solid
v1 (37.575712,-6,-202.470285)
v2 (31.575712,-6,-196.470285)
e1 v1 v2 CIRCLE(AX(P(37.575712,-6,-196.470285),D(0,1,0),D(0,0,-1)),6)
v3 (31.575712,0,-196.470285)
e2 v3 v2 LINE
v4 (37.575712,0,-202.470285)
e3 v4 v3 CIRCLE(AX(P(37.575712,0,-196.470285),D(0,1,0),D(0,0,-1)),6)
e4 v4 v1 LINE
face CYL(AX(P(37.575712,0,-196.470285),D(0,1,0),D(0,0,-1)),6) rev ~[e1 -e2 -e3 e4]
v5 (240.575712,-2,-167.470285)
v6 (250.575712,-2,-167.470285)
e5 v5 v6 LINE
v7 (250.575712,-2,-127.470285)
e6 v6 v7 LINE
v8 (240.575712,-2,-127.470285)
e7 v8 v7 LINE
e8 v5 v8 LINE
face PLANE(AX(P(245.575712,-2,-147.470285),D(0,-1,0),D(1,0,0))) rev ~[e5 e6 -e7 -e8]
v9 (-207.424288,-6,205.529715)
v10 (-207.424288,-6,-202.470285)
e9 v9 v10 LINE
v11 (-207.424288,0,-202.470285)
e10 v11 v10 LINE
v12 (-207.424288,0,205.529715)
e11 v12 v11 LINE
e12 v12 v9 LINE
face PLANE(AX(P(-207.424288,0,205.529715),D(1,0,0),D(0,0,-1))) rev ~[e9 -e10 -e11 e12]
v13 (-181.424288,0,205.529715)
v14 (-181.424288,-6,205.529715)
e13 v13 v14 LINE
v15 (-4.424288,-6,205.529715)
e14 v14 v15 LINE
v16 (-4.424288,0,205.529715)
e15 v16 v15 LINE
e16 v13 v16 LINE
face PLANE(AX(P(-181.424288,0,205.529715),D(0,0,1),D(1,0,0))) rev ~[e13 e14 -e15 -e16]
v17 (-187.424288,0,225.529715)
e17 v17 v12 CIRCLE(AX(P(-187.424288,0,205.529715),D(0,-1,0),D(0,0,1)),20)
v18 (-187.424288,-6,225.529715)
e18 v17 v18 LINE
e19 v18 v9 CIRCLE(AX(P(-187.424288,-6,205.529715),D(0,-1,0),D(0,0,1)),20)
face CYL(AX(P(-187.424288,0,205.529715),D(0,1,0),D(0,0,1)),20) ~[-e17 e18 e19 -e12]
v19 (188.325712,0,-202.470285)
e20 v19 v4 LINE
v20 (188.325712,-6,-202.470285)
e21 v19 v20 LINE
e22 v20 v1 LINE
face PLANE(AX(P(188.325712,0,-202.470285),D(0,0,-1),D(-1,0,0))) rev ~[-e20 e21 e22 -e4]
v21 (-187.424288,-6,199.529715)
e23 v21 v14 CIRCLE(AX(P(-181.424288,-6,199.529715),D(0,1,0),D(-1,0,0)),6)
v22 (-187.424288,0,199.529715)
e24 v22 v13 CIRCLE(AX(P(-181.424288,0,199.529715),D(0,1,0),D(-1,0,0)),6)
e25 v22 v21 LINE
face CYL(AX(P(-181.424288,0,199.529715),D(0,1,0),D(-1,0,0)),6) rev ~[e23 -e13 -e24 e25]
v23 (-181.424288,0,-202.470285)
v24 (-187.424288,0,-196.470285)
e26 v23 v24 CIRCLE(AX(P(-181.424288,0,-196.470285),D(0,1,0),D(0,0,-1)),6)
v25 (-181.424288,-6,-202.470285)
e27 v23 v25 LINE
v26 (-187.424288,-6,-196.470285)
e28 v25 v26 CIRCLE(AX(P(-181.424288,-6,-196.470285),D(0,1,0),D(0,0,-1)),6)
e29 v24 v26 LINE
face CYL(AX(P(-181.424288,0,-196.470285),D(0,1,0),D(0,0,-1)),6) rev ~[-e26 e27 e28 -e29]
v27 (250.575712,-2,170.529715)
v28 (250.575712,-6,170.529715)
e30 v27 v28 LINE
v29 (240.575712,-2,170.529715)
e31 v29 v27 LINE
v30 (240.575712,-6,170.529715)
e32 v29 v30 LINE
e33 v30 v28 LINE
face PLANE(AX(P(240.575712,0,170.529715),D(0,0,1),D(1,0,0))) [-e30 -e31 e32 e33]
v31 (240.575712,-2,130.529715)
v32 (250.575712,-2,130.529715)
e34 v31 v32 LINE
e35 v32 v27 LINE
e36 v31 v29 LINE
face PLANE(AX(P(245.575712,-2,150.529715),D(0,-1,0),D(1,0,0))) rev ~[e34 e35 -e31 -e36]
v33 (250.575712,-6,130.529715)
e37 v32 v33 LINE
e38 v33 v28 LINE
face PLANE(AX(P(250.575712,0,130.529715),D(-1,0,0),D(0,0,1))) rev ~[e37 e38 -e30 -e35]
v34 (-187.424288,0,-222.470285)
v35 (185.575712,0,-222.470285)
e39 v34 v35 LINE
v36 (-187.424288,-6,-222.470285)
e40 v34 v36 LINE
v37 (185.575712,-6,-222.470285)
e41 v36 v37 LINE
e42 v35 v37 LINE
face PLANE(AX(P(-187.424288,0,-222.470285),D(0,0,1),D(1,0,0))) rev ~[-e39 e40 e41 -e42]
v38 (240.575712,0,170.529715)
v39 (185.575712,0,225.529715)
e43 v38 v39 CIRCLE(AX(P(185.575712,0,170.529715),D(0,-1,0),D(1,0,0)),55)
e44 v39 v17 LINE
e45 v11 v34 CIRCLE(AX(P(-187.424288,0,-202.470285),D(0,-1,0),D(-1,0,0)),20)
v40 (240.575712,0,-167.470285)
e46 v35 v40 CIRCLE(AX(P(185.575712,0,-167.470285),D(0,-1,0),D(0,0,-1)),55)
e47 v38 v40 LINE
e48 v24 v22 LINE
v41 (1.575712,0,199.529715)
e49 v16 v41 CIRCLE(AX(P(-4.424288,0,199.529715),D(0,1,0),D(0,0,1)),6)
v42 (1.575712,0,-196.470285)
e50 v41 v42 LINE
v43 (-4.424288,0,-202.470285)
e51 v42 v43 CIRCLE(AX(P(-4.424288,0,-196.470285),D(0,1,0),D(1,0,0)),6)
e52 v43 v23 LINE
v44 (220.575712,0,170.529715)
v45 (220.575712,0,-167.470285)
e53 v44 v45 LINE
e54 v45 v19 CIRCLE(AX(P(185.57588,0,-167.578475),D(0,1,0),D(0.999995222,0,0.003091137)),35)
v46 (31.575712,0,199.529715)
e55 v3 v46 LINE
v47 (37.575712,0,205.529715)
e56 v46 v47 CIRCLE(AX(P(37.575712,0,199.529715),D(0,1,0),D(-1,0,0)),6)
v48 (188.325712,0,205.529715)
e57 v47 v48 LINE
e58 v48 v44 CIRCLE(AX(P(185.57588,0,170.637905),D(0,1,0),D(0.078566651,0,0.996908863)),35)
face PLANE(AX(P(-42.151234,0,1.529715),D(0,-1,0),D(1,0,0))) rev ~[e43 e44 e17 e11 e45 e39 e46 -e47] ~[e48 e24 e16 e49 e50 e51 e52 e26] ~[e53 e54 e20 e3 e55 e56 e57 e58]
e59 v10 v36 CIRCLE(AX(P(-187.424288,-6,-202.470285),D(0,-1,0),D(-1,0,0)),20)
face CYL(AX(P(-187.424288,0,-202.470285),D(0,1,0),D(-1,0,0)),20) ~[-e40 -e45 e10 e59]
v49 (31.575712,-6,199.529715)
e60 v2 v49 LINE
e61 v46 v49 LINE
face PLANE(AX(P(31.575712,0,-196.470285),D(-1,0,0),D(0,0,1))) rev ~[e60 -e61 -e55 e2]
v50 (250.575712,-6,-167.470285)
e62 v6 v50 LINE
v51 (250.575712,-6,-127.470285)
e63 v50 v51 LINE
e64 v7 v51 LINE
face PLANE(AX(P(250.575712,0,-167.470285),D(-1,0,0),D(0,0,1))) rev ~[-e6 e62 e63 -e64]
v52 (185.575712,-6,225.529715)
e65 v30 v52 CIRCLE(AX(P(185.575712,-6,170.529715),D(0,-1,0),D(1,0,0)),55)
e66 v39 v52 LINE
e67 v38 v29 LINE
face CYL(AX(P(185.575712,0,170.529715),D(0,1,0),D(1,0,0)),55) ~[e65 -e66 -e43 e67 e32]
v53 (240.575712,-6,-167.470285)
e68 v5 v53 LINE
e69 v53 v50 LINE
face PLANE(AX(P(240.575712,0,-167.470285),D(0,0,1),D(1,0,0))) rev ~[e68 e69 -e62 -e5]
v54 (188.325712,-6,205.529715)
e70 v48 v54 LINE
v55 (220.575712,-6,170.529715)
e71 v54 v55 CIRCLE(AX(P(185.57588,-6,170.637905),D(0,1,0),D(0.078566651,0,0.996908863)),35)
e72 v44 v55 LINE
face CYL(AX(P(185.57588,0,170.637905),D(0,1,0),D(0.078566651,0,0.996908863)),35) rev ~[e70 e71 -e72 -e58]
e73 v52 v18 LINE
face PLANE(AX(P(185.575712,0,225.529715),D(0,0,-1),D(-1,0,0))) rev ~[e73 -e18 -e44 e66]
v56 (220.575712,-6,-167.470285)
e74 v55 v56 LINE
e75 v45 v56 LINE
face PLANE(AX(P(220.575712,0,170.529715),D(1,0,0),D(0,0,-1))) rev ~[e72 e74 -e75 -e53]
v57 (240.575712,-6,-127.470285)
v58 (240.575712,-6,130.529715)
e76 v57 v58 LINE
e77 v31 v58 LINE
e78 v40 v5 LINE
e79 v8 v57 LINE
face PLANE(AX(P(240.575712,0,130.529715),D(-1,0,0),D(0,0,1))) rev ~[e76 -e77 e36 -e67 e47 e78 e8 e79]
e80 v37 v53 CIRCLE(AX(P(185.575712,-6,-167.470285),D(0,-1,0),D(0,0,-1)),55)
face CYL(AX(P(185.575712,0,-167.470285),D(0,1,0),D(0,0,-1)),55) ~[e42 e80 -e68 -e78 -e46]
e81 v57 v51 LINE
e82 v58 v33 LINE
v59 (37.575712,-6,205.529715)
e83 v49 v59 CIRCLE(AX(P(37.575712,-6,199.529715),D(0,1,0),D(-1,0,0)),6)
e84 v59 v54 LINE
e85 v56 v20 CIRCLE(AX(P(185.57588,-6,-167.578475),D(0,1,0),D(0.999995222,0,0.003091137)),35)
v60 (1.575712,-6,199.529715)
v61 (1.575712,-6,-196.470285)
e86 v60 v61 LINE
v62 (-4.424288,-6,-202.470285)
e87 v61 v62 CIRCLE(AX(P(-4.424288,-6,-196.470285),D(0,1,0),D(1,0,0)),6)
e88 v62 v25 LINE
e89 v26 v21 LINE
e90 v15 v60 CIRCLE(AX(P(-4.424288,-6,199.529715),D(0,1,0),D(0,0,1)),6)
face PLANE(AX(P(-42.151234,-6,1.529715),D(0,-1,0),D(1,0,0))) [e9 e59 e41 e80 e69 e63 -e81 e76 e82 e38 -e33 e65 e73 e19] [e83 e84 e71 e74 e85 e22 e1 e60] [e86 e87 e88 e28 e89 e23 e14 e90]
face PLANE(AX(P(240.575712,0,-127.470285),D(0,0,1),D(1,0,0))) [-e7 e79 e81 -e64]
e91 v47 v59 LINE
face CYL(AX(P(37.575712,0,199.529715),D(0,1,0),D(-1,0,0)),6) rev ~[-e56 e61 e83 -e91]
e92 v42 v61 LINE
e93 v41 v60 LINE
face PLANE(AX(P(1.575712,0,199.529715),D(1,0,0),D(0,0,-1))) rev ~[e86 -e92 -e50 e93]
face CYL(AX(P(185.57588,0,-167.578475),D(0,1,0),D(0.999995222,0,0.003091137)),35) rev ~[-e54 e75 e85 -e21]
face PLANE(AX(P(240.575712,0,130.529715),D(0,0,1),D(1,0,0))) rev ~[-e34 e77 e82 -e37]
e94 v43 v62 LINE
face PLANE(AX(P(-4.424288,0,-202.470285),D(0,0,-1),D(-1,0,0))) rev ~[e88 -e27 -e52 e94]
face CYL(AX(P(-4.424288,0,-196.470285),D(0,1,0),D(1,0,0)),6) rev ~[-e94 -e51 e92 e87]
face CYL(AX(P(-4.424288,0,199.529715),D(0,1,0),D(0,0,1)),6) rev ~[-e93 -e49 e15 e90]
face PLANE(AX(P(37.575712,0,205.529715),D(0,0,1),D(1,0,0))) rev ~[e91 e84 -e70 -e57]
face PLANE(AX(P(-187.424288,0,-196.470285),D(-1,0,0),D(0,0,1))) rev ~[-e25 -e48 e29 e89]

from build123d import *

# Parameters (mm, degrees)
F0_W     = 10
F0_H     = 40
F0_W_2   = 6
F0_W_3   = 14
F0_H_2   = 258
F1_DEPTH = 6
F2_DEPTH = 2


with BuildPart() as f1:
    # F0 (on Front) → F1 (new body)
    with BuildSketch(Plane.XZ):
        with BuildLine():
            Line((185.575712414, 225.5297148285), (-187.424287586, 225.5297148285))
            ThreePointArc((-187.424287586, 225.5297148285), (-201.5664232098, 219.6718504522), (-207.424287586, 205.5297148285))
            Line((-207.424287586, 205.5297148285), (-207.424287586, -202.4702851715))
            ThreePointArc((-207.424287586, -202.4702851715), (-201.5664232098, -216.6124207953), (-187.424287586, -222.4702851715))
            Line((-187.424287586, -222.4702851715), (185.575712414, -222.4702851715))
            ThreePointArc((185.575712414, -222.4702851715), (224.4665853792, -206.3611581368), (240.575712414, -167.4702851715))
            Line((240.575712414, -167.4702851715), (234.575712414, -167.4702851715))
            ThreePointArc((234.575712414, -167.4702851715), (220.2239446921, -202.1185174497), (185.575712414, -216.4702851715))
            Line((185.575712414, -216.4702851715), (-187.424287586, -216.4702851715))
            ThreePointArc((-187.424287586, -216.4702851715), (-197.3237825226, -212.3697801081), (-201.424287586, -202.4702851715))
            Line((-201.424287586, -202.4702851715), (-201.424287586, 205.5297148285))
            ThreePointArc((-201.424287586, 205.5297148285), (-197.3237825226, 215.4292097651), (-187.424287586, 219.5297148285))
            Line((-187.424287586, 219.5297148285), (185.575712414, 219.5297148285))
            ThreePointArc((185.575712414, 219.5297148285), (220.2239446921, 205.1779471066), (234.575712414, 170.5297148285))
            Line((234.575712414, 170.5297148285), (240.575712414, 170.5297148285))
            ThreePointArc((240.575712414, 170.5297148285), (224.4665853792, 209.4205877937), (185.575712414, 225.5297148285))
        make_face()
        with BuildLine():
            Line((220.575712414, 170.5297148285), (234.575712414, 170.5297148285))
            ThreePointArc((234.575712414, 170.5297148285), (220.2239446921, 205.1779471066), (185.575712414, 219.5297148285))
            Line((185.575712414, 219.5297148285), (-187.424287586, 219.5297148285))
            ThreePointArc((-187.424287586, 219.5297148285), (-197.3237825226, 215.4292097651), (-201.424287586, 205.5297148285))
            Line((-201.424287586, 205.5297148285), (-201.424287586, -202.4702851715))
            ThreePointArc((-201.424287586, -202.4702851715), (-197.3237825226, -212.3697801081), (-187.424287586, -216.4702851715))
            Line((-187.424287586, -216.4702851715), (185.575712414, -216.4702851715))
            ThreePointArc((185.575712414, -216.4702851715), (220.2239446921, -202.1185174497), (234.575712414, -167.4702851715))
            Line((234.575712414, -167.4702851715), (220.575712414, -167.4702851715))
            ThreePointArc((220.575712414, -167.4702851715), (211.315135886, -191.295361085), (188.325712414, -202.4702851715))
            Line((188.325712414, -202.4702851715), (37.575712414, -202.4702851715))
            ThreePointArc((37.575712414, -202.4702851715), (33.3330717268, -200.7129258587), (31.575712414, -196.4702851715))
            Line((31.575712414, -196.4702851715), (31.575712414, 199.5297148285))
            ThreePointArc((31.575712414, 199.5297148285), (33.3330717268, 203.7723555156), (37.575712414, 205.5297148285))
            Line((37.575712414, 205.5297148285), (188.325712414, 205.5297148285))
            ThreePointArc((188.325712414, 205.5297148285), (211.315135886, 194.354790742), (220.575712414, 170.5297148285))
        make_face()
        with BuildLine():
            Line((-187.424287586, -196.4702851715), (-187.424287586, 199.5297148285))
            ThreePointArc((-187.424287586, 199.5297148285), (-185.6669282732, 203.7723555156), (-181.424287586, 205.5297148285))
            Line((-181.424287586, 205.5297148285), (-4.424287586, 205.5297148285))
            ThreePointArc((-4.424287586, 205.5297148285), (-0.1816468989, 203.7723555156), (1.575712414, 199.5297148285))
            Line((1.575712414, 199.5297148285), (1.575712414, -196.4702851715))
            ThreePointArc((1.575712414, -196.4702851715), (-0.1816468989, -200.7129258587), (-4.424287586, -202.4702851715))
            Line((-4.424287586, -202.4702851715), (-181.424287586, -202.4702851715))
            ThreePointArc((-181.424287586, -202.4702851715), (-185.6669282732, -200.7129258587), (-187.424287586, -196.4702851715))
        make_face(mode=Mode.SUBTRACT)
        with Locations((245.575712414, 150.5297148285)):
            Rectangle(F0_W, F0_H)
        with Locations((237.575712414, 150.5297148285)):
            Rectangle(F0_W_2, F0_H)
        with Locations((227.575712414, 150.5297148285)):
            Rectangle(F0_W_3, F0_H)
        with Locations((227.575712414, 1.5297148285)):
            Rectangle(F0_W_3, F0_H_2)
        with Locations((237.575712414, 1.5297148285)):
            Rectangle(F0_W_2, F0_H_2)
        with Locations((237.575712414, -147.4702851715)):
            Rectangle(F0_W_2, F0_H)
        with Locations((227.575712414, -147.4702851715)):
            Rectangle(F0_W_3, F0_H)
        with Locations((245.575712414, -147.4702851715)):
            Rectangle(F0_W, F0_H)
    extrude(amount=F1_DEPTH)

    # F0 (on Front) → F2 (cut)
    with BuildSketch(Plane.XZ):
        with Locations((245.575712414, 150.5297148285)):
            Rectangle(F0_W, F0_H)
        with Locations((245.575712414, -147.4702851715)):
            Rectangle(F0_W, F0_H)
    extrude(amount=F2_DEPTH, mode=Mode.SUBTRACT)


solid = f1.part
